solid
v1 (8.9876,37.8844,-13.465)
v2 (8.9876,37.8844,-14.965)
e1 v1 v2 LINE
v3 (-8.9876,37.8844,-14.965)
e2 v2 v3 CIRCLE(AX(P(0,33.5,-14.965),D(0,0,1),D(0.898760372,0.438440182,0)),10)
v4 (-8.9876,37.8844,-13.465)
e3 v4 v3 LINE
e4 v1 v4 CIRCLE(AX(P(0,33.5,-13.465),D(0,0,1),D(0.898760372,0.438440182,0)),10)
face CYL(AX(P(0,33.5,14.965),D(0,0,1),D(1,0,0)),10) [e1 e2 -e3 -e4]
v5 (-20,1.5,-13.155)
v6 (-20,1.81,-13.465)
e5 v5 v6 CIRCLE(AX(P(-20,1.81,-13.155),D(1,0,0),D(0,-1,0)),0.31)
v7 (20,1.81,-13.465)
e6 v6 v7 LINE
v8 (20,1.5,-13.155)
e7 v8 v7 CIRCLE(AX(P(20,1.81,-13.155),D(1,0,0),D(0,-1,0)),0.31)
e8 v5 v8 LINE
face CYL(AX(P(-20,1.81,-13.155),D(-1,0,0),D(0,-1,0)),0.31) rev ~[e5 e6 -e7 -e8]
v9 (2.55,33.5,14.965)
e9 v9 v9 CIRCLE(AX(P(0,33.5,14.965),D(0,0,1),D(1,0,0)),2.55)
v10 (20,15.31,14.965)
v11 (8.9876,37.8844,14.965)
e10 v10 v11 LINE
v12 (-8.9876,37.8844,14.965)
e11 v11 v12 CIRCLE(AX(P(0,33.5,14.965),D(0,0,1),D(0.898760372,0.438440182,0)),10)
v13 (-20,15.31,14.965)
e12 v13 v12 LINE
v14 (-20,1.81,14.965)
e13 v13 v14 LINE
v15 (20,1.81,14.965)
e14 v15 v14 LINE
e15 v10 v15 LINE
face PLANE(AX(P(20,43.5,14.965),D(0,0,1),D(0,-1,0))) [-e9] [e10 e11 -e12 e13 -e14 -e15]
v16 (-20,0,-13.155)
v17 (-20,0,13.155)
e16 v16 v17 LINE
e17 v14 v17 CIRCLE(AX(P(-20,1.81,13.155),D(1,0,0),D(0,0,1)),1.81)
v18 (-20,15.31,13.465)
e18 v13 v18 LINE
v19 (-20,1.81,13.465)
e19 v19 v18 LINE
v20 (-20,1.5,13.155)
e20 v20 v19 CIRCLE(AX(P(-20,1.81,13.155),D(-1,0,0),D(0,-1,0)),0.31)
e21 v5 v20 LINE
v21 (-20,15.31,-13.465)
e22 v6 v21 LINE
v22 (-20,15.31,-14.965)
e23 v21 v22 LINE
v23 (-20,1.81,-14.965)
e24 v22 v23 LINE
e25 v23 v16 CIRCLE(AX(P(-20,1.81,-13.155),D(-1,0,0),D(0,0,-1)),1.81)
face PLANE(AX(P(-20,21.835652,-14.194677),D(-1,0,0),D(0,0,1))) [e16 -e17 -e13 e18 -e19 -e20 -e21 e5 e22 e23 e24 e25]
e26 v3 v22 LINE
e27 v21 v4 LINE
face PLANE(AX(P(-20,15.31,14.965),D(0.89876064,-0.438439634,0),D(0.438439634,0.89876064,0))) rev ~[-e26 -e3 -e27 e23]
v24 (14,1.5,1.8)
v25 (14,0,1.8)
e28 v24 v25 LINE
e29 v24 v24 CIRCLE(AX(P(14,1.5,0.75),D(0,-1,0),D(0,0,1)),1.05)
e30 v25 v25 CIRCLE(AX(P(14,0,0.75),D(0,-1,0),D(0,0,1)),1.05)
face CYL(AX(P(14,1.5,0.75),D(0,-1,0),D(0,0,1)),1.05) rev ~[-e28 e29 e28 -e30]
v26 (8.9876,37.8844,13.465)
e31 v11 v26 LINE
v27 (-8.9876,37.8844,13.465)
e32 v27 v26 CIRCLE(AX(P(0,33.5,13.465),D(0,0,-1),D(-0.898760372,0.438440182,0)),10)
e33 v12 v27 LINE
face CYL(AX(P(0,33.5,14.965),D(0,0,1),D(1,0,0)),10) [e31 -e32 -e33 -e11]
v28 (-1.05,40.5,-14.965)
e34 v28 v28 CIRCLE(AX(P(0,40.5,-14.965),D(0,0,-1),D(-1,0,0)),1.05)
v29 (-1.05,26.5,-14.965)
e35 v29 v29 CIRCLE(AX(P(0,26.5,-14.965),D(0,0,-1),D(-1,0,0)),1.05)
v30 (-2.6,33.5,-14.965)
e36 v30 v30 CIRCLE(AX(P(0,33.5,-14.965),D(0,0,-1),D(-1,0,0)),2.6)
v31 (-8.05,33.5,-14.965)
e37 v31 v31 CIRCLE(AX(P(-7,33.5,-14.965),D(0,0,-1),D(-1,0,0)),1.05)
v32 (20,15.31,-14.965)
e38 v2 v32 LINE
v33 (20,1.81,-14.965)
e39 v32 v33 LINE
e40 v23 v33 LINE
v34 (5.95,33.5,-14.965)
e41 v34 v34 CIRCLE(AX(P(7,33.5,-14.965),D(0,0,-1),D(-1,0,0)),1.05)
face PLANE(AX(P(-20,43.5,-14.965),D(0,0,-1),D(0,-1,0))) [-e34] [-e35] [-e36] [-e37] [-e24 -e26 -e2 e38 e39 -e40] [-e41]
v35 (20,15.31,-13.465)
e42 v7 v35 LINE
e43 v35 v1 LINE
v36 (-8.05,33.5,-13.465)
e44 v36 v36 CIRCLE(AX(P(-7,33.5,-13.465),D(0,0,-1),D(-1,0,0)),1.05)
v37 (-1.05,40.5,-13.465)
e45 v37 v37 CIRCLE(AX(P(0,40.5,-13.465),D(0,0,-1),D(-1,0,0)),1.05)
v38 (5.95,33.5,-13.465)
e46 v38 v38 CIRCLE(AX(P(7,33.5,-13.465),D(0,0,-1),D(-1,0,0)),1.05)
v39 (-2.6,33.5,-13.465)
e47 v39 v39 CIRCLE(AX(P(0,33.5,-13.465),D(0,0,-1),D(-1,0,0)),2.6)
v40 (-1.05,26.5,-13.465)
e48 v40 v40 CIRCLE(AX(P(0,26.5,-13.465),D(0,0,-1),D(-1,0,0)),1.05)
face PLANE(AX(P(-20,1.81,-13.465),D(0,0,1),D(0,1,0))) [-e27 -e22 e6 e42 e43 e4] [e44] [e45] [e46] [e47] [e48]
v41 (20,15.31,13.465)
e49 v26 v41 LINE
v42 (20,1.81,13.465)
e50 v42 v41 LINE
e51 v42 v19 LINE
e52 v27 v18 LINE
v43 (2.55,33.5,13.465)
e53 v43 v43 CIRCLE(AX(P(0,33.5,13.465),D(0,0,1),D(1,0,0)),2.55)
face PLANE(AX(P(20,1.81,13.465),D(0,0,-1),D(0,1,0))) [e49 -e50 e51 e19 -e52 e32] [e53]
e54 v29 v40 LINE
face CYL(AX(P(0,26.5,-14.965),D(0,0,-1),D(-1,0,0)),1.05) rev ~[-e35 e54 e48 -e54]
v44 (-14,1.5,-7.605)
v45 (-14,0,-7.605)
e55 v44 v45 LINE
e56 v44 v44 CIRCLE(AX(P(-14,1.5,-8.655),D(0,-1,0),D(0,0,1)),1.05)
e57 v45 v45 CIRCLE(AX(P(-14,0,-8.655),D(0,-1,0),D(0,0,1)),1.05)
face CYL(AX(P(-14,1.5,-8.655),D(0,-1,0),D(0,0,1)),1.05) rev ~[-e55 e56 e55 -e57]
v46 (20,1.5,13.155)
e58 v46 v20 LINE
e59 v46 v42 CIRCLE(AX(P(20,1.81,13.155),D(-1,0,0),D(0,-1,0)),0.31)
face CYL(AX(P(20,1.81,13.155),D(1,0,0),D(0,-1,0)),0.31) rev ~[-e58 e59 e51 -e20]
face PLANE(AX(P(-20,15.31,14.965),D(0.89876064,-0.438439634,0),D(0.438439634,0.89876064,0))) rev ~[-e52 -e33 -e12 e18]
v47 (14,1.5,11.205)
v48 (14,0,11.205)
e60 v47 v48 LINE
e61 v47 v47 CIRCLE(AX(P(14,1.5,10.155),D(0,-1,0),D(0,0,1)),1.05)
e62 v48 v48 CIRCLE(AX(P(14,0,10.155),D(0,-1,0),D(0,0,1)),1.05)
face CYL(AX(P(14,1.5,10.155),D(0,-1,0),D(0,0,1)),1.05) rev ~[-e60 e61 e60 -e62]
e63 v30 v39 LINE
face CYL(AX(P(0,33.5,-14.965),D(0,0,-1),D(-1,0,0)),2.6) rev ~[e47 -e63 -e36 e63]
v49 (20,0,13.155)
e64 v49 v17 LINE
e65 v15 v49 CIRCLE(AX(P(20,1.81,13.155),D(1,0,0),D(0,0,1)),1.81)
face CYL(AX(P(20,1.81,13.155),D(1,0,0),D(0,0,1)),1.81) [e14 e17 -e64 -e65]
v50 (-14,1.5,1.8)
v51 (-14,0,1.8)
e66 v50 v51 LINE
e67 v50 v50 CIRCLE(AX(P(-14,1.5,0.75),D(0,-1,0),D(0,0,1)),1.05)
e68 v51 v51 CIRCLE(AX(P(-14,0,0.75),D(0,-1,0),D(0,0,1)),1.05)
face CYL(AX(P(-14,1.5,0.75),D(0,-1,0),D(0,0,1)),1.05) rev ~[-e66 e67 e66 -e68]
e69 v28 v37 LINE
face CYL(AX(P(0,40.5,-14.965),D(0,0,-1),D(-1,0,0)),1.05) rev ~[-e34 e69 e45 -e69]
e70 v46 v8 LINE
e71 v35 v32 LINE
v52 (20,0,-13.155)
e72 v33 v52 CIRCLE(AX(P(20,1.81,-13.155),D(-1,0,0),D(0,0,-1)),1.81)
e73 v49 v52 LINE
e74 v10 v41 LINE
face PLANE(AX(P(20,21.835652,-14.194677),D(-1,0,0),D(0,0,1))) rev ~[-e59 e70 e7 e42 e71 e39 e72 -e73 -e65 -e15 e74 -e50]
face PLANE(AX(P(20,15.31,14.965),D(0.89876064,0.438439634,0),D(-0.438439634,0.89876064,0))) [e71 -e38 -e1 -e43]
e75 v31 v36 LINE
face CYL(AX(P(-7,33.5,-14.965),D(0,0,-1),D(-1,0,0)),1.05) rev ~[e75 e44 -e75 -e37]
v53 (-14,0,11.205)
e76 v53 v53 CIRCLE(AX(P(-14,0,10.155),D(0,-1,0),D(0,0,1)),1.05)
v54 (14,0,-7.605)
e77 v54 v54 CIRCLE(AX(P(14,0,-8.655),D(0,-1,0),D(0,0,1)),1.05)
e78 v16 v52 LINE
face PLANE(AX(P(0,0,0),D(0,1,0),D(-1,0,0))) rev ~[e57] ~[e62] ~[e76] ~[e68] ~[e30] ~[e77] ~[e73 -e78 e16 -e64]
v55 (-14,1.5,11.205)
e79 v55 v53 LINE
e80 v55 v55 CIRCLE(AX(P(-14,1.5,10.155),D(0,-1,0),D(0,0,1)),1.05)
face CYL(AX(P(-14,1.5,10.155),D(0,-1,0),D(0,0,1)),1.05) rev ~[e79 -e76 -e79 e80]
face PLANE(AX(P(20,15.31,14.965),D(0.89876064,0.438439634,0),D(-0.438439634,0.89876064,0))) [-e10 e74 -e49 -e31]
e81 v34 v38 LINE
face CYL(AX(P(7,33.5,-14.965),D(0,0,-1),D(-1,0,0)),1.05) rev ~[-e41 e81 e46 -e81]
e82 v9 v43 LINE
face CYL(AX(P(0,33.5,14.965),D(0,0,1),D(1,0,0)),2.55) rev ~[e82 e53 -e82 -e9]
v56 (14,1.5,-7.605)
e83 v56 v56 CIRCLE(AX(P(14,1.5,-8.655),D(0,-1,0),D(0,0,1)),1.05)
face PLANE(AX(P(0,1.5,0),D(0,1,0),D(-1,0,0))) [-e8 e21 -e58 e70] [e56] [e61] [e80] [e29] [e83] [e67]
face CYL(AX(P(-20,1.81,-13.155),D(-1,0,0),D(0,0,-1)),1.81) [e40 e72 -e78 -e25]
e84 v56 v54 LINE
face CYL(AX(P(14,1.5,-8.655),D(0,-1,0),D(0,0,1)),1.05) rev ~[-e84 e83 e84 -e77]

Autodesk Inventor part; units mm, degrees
ref_plane "YZ Plane" through (0, 0, 0) normal (1, 0, 0) x (0, 1, 0)
ref_plane "XZ Plane" through (0, 0, 0) normal (0, 1, 0) x (-1, 0, 0)
ref_plane "XY Plane" through (0, 0, 0) normal (0, 0, 1) x (1, 0, 0)
sketch "Sketch1" plane through (0, 0, 0) normal (0, 1, 0) x (-1, 0, 0)
  line L0 (20, 14.965) -> (-20, 14.965)
  line L1 (-20, 14.965) -> (-20, -14.965)
  line L2 (-20, -14.965) -> (20, -14.965)
  line L3 (20, -14.965) -> (20, 14.965)
  point P0 (0, 0)
  dimension "d0" = 29.93
  dimension "d1" = 40
  dimension "d2" = 20
  dimension "d3" = 14.965
extrude "Plate1" add sketch "Sketch1" along normal blind 1.5
sketch "Sketch2" plane through (-20, 0, -13.465) normal (0, 0, -1) x (-1, 0, 0)
  line L0 (-40, 0) -> (0, 0)
  line L1 (0, 0) -> (0, 43.5)
  line L2 (0, 43.5) -> (-40, 43.5)
  line L3 (-40, 43.5) -> (-40, 0)
edge flange "Flange1" height 43.5 angle 90 thickness 1.5 bend radius 0.31 thickness toward (0, 0, -1) relief tear relief width 1.5 relief depth 0.75 corner gap 0.31 corner form 0 edges at (0, 1.5, -14.965) (0, 1.5, 14.965) wall of the first edge with corners at (20, 0, -13.465) (-20, 0, -13.465) (-20, 43.5, -13.465) (20, 43.5, -13.465)
bend "Bend1"
corner "Corner1"
sketch "Sketch3" plane through (-20, 43.5, 14.965) normal (0, 0, 1) x (1, 0, 0)
  line L0 (0, 0) -> (40, 0) projected
  line L1 (0, -41.69) -> (0, 0) projected
  circle A0 centre (20, -10) radius 10
  line L2 (0, -28.19) -> (40, -28.19)
  line L3 (40, -28.19) -> (40, -38.19)
  line L4 (40, -38.19) -> (0, -38.19)
  line L5 (0, -38.19) -> (0, -28.19)
  line L6 (40, -28.19) -> (28.9876, -5.6156)
  line L7 (0, -28.19) -> (11.0124, -5.6156)
  line L8 (0, 0) -> (40, 0)
  line L9 (40, 0) -> (40, -35)
  line L10 (40, -35) -> (0, -35)
  line L11 (0, -35) -> (0, 0)
  point P0 (20, -43.5)
  point P1 (20, 0)
  point P2 (0, -28.19)
  point P3 (0, -35)
  point P4 (30, -10)
  dimension "d15" = 10
  dimension "d16" = 0
  dimension "d17" = 20
  dimension "d18" = 18.19
  dimension "d19" = 0
  dimension "d20" = 40
  dimension "d21" = 10
  dimension "d22" = 35
extrude "Extrusion1" cut sketch "Sketch3" against normal blind 35 contours L0 A0 L7 L1 | L0 L9 L6 A0
sketch "Sketch4" plane through (20, 1.81, -14.965) normal (0, 0, -1) x (-1, 0, 0)
  arc A0 (28.9876, 36.0744) -> (11.0124, 36.0744) centre (20, 31.69) ccw projected
  circle A1 centre (20, 31.69) radius 2.6
  circle A2 centre (13, 31.69) radius 1.05
  circle A3 centre (27, 31.69) radius 1.05
  circle A4 centre (20, 38.69) radius 1.05
  circle A5 centre (20, 24.69) radius 1.05
  point P0 (20, -1.81)
  dimension "d25" = 5.2
  dimension "d26" = 0
  dimension "d27" = 7
  dimension "d28" = 2.1
  dimension "d29" = 7
  dimension "d30" = 0
  dimension "d31" = 2.1
  dimension "d32" = 0
  dimension "d33" = 7
  dimension "d34" = 2.1
  dimension "d35" = 7
  dimension "d36" = 0
  dimension "d37" = 2.1
extrude "Extrusion2" cut sketch "Sketch4" against normal blind 1.5
sketch "Sketch5" plane through (-20, 1.81, 14.965) normal (0, 0, 1) x (1, 0, 0)
  arc A0 (28.9876, 36.0744) -> (11.0124, 36.0744) centre (20, 31.69) ccw projected
  circle A1 centre (20, 31.69) radius 2.55
  point P0 (20, -1.81)
  dimension "d40" = 5.1
extrude "Extrusion3" cut sketch "Sketch5" against normal blind 1.5
sketch "Sketch6" plane through (0, 1.5, 0) normal (0, 1, 0) x (1, 0, 0)
  circle A0 centre (-14, -10.155) radius 1.05 projected
  circle A1 centre (-14, -0.75) radius 1.05 projected
  circle A2 centre (-14, 8.655) radius 1.05 projected
  circle A3 centre (14, -10.155) radius 1.05 projected
  circle A4 centre (14, -0.75) radius 1.05 projected
  circle A5 centre (14, 8.655) radius 1.05 projected
  point P0 (0, 0)
hole "Hole1" at (14, 1.5, -8.655) at (14, 1.5, 0.75) at (14, 1.5, 10.155) at (-14, 1.5, 10.155) at (-14, 1.5, 0.75) at (-14, 1.5, -8.655) direction (0, -1, 0) diameter 2.1 depth 1.5
equation "\"d48\" = Thickness"
equation "\"d4\" = Thickness"
equation "\"d5\" = BendReliefWidth"
equation "\"d6\" = BendReliefDepth"
equation "\"d7\" = MinimumRemnant"
equation "\"d8\" = TransitionRadius"
equation "\"d11\" = BendRadius"
equation "\"d12\" = CornerReliefSize"
equation "\"d13\" = GapSize"
equation "\"d14\" = JacobiRadiusSize"
equation "\"BendReliefWidth\" = Thickness"
equation "\"BendReliefDepth\" = 0.5 * Thickness"
equation "\"CornerReliefSize\" = 4 * Thickness"
equation "\"MinimumRemnant\" = 2 * Thickness"
equation "\"TransitionRadius\" = BendRadius"
equation "\"JacobiRadiusSize\" = BendRadius"
equation "\"GapSize\" = Thickness"
equation "\"Thickness\" = 1.5"
equation "\"BendRadius\" = 0.31"
properties part number "partpart" material "Aluminum 6061-AHC"
